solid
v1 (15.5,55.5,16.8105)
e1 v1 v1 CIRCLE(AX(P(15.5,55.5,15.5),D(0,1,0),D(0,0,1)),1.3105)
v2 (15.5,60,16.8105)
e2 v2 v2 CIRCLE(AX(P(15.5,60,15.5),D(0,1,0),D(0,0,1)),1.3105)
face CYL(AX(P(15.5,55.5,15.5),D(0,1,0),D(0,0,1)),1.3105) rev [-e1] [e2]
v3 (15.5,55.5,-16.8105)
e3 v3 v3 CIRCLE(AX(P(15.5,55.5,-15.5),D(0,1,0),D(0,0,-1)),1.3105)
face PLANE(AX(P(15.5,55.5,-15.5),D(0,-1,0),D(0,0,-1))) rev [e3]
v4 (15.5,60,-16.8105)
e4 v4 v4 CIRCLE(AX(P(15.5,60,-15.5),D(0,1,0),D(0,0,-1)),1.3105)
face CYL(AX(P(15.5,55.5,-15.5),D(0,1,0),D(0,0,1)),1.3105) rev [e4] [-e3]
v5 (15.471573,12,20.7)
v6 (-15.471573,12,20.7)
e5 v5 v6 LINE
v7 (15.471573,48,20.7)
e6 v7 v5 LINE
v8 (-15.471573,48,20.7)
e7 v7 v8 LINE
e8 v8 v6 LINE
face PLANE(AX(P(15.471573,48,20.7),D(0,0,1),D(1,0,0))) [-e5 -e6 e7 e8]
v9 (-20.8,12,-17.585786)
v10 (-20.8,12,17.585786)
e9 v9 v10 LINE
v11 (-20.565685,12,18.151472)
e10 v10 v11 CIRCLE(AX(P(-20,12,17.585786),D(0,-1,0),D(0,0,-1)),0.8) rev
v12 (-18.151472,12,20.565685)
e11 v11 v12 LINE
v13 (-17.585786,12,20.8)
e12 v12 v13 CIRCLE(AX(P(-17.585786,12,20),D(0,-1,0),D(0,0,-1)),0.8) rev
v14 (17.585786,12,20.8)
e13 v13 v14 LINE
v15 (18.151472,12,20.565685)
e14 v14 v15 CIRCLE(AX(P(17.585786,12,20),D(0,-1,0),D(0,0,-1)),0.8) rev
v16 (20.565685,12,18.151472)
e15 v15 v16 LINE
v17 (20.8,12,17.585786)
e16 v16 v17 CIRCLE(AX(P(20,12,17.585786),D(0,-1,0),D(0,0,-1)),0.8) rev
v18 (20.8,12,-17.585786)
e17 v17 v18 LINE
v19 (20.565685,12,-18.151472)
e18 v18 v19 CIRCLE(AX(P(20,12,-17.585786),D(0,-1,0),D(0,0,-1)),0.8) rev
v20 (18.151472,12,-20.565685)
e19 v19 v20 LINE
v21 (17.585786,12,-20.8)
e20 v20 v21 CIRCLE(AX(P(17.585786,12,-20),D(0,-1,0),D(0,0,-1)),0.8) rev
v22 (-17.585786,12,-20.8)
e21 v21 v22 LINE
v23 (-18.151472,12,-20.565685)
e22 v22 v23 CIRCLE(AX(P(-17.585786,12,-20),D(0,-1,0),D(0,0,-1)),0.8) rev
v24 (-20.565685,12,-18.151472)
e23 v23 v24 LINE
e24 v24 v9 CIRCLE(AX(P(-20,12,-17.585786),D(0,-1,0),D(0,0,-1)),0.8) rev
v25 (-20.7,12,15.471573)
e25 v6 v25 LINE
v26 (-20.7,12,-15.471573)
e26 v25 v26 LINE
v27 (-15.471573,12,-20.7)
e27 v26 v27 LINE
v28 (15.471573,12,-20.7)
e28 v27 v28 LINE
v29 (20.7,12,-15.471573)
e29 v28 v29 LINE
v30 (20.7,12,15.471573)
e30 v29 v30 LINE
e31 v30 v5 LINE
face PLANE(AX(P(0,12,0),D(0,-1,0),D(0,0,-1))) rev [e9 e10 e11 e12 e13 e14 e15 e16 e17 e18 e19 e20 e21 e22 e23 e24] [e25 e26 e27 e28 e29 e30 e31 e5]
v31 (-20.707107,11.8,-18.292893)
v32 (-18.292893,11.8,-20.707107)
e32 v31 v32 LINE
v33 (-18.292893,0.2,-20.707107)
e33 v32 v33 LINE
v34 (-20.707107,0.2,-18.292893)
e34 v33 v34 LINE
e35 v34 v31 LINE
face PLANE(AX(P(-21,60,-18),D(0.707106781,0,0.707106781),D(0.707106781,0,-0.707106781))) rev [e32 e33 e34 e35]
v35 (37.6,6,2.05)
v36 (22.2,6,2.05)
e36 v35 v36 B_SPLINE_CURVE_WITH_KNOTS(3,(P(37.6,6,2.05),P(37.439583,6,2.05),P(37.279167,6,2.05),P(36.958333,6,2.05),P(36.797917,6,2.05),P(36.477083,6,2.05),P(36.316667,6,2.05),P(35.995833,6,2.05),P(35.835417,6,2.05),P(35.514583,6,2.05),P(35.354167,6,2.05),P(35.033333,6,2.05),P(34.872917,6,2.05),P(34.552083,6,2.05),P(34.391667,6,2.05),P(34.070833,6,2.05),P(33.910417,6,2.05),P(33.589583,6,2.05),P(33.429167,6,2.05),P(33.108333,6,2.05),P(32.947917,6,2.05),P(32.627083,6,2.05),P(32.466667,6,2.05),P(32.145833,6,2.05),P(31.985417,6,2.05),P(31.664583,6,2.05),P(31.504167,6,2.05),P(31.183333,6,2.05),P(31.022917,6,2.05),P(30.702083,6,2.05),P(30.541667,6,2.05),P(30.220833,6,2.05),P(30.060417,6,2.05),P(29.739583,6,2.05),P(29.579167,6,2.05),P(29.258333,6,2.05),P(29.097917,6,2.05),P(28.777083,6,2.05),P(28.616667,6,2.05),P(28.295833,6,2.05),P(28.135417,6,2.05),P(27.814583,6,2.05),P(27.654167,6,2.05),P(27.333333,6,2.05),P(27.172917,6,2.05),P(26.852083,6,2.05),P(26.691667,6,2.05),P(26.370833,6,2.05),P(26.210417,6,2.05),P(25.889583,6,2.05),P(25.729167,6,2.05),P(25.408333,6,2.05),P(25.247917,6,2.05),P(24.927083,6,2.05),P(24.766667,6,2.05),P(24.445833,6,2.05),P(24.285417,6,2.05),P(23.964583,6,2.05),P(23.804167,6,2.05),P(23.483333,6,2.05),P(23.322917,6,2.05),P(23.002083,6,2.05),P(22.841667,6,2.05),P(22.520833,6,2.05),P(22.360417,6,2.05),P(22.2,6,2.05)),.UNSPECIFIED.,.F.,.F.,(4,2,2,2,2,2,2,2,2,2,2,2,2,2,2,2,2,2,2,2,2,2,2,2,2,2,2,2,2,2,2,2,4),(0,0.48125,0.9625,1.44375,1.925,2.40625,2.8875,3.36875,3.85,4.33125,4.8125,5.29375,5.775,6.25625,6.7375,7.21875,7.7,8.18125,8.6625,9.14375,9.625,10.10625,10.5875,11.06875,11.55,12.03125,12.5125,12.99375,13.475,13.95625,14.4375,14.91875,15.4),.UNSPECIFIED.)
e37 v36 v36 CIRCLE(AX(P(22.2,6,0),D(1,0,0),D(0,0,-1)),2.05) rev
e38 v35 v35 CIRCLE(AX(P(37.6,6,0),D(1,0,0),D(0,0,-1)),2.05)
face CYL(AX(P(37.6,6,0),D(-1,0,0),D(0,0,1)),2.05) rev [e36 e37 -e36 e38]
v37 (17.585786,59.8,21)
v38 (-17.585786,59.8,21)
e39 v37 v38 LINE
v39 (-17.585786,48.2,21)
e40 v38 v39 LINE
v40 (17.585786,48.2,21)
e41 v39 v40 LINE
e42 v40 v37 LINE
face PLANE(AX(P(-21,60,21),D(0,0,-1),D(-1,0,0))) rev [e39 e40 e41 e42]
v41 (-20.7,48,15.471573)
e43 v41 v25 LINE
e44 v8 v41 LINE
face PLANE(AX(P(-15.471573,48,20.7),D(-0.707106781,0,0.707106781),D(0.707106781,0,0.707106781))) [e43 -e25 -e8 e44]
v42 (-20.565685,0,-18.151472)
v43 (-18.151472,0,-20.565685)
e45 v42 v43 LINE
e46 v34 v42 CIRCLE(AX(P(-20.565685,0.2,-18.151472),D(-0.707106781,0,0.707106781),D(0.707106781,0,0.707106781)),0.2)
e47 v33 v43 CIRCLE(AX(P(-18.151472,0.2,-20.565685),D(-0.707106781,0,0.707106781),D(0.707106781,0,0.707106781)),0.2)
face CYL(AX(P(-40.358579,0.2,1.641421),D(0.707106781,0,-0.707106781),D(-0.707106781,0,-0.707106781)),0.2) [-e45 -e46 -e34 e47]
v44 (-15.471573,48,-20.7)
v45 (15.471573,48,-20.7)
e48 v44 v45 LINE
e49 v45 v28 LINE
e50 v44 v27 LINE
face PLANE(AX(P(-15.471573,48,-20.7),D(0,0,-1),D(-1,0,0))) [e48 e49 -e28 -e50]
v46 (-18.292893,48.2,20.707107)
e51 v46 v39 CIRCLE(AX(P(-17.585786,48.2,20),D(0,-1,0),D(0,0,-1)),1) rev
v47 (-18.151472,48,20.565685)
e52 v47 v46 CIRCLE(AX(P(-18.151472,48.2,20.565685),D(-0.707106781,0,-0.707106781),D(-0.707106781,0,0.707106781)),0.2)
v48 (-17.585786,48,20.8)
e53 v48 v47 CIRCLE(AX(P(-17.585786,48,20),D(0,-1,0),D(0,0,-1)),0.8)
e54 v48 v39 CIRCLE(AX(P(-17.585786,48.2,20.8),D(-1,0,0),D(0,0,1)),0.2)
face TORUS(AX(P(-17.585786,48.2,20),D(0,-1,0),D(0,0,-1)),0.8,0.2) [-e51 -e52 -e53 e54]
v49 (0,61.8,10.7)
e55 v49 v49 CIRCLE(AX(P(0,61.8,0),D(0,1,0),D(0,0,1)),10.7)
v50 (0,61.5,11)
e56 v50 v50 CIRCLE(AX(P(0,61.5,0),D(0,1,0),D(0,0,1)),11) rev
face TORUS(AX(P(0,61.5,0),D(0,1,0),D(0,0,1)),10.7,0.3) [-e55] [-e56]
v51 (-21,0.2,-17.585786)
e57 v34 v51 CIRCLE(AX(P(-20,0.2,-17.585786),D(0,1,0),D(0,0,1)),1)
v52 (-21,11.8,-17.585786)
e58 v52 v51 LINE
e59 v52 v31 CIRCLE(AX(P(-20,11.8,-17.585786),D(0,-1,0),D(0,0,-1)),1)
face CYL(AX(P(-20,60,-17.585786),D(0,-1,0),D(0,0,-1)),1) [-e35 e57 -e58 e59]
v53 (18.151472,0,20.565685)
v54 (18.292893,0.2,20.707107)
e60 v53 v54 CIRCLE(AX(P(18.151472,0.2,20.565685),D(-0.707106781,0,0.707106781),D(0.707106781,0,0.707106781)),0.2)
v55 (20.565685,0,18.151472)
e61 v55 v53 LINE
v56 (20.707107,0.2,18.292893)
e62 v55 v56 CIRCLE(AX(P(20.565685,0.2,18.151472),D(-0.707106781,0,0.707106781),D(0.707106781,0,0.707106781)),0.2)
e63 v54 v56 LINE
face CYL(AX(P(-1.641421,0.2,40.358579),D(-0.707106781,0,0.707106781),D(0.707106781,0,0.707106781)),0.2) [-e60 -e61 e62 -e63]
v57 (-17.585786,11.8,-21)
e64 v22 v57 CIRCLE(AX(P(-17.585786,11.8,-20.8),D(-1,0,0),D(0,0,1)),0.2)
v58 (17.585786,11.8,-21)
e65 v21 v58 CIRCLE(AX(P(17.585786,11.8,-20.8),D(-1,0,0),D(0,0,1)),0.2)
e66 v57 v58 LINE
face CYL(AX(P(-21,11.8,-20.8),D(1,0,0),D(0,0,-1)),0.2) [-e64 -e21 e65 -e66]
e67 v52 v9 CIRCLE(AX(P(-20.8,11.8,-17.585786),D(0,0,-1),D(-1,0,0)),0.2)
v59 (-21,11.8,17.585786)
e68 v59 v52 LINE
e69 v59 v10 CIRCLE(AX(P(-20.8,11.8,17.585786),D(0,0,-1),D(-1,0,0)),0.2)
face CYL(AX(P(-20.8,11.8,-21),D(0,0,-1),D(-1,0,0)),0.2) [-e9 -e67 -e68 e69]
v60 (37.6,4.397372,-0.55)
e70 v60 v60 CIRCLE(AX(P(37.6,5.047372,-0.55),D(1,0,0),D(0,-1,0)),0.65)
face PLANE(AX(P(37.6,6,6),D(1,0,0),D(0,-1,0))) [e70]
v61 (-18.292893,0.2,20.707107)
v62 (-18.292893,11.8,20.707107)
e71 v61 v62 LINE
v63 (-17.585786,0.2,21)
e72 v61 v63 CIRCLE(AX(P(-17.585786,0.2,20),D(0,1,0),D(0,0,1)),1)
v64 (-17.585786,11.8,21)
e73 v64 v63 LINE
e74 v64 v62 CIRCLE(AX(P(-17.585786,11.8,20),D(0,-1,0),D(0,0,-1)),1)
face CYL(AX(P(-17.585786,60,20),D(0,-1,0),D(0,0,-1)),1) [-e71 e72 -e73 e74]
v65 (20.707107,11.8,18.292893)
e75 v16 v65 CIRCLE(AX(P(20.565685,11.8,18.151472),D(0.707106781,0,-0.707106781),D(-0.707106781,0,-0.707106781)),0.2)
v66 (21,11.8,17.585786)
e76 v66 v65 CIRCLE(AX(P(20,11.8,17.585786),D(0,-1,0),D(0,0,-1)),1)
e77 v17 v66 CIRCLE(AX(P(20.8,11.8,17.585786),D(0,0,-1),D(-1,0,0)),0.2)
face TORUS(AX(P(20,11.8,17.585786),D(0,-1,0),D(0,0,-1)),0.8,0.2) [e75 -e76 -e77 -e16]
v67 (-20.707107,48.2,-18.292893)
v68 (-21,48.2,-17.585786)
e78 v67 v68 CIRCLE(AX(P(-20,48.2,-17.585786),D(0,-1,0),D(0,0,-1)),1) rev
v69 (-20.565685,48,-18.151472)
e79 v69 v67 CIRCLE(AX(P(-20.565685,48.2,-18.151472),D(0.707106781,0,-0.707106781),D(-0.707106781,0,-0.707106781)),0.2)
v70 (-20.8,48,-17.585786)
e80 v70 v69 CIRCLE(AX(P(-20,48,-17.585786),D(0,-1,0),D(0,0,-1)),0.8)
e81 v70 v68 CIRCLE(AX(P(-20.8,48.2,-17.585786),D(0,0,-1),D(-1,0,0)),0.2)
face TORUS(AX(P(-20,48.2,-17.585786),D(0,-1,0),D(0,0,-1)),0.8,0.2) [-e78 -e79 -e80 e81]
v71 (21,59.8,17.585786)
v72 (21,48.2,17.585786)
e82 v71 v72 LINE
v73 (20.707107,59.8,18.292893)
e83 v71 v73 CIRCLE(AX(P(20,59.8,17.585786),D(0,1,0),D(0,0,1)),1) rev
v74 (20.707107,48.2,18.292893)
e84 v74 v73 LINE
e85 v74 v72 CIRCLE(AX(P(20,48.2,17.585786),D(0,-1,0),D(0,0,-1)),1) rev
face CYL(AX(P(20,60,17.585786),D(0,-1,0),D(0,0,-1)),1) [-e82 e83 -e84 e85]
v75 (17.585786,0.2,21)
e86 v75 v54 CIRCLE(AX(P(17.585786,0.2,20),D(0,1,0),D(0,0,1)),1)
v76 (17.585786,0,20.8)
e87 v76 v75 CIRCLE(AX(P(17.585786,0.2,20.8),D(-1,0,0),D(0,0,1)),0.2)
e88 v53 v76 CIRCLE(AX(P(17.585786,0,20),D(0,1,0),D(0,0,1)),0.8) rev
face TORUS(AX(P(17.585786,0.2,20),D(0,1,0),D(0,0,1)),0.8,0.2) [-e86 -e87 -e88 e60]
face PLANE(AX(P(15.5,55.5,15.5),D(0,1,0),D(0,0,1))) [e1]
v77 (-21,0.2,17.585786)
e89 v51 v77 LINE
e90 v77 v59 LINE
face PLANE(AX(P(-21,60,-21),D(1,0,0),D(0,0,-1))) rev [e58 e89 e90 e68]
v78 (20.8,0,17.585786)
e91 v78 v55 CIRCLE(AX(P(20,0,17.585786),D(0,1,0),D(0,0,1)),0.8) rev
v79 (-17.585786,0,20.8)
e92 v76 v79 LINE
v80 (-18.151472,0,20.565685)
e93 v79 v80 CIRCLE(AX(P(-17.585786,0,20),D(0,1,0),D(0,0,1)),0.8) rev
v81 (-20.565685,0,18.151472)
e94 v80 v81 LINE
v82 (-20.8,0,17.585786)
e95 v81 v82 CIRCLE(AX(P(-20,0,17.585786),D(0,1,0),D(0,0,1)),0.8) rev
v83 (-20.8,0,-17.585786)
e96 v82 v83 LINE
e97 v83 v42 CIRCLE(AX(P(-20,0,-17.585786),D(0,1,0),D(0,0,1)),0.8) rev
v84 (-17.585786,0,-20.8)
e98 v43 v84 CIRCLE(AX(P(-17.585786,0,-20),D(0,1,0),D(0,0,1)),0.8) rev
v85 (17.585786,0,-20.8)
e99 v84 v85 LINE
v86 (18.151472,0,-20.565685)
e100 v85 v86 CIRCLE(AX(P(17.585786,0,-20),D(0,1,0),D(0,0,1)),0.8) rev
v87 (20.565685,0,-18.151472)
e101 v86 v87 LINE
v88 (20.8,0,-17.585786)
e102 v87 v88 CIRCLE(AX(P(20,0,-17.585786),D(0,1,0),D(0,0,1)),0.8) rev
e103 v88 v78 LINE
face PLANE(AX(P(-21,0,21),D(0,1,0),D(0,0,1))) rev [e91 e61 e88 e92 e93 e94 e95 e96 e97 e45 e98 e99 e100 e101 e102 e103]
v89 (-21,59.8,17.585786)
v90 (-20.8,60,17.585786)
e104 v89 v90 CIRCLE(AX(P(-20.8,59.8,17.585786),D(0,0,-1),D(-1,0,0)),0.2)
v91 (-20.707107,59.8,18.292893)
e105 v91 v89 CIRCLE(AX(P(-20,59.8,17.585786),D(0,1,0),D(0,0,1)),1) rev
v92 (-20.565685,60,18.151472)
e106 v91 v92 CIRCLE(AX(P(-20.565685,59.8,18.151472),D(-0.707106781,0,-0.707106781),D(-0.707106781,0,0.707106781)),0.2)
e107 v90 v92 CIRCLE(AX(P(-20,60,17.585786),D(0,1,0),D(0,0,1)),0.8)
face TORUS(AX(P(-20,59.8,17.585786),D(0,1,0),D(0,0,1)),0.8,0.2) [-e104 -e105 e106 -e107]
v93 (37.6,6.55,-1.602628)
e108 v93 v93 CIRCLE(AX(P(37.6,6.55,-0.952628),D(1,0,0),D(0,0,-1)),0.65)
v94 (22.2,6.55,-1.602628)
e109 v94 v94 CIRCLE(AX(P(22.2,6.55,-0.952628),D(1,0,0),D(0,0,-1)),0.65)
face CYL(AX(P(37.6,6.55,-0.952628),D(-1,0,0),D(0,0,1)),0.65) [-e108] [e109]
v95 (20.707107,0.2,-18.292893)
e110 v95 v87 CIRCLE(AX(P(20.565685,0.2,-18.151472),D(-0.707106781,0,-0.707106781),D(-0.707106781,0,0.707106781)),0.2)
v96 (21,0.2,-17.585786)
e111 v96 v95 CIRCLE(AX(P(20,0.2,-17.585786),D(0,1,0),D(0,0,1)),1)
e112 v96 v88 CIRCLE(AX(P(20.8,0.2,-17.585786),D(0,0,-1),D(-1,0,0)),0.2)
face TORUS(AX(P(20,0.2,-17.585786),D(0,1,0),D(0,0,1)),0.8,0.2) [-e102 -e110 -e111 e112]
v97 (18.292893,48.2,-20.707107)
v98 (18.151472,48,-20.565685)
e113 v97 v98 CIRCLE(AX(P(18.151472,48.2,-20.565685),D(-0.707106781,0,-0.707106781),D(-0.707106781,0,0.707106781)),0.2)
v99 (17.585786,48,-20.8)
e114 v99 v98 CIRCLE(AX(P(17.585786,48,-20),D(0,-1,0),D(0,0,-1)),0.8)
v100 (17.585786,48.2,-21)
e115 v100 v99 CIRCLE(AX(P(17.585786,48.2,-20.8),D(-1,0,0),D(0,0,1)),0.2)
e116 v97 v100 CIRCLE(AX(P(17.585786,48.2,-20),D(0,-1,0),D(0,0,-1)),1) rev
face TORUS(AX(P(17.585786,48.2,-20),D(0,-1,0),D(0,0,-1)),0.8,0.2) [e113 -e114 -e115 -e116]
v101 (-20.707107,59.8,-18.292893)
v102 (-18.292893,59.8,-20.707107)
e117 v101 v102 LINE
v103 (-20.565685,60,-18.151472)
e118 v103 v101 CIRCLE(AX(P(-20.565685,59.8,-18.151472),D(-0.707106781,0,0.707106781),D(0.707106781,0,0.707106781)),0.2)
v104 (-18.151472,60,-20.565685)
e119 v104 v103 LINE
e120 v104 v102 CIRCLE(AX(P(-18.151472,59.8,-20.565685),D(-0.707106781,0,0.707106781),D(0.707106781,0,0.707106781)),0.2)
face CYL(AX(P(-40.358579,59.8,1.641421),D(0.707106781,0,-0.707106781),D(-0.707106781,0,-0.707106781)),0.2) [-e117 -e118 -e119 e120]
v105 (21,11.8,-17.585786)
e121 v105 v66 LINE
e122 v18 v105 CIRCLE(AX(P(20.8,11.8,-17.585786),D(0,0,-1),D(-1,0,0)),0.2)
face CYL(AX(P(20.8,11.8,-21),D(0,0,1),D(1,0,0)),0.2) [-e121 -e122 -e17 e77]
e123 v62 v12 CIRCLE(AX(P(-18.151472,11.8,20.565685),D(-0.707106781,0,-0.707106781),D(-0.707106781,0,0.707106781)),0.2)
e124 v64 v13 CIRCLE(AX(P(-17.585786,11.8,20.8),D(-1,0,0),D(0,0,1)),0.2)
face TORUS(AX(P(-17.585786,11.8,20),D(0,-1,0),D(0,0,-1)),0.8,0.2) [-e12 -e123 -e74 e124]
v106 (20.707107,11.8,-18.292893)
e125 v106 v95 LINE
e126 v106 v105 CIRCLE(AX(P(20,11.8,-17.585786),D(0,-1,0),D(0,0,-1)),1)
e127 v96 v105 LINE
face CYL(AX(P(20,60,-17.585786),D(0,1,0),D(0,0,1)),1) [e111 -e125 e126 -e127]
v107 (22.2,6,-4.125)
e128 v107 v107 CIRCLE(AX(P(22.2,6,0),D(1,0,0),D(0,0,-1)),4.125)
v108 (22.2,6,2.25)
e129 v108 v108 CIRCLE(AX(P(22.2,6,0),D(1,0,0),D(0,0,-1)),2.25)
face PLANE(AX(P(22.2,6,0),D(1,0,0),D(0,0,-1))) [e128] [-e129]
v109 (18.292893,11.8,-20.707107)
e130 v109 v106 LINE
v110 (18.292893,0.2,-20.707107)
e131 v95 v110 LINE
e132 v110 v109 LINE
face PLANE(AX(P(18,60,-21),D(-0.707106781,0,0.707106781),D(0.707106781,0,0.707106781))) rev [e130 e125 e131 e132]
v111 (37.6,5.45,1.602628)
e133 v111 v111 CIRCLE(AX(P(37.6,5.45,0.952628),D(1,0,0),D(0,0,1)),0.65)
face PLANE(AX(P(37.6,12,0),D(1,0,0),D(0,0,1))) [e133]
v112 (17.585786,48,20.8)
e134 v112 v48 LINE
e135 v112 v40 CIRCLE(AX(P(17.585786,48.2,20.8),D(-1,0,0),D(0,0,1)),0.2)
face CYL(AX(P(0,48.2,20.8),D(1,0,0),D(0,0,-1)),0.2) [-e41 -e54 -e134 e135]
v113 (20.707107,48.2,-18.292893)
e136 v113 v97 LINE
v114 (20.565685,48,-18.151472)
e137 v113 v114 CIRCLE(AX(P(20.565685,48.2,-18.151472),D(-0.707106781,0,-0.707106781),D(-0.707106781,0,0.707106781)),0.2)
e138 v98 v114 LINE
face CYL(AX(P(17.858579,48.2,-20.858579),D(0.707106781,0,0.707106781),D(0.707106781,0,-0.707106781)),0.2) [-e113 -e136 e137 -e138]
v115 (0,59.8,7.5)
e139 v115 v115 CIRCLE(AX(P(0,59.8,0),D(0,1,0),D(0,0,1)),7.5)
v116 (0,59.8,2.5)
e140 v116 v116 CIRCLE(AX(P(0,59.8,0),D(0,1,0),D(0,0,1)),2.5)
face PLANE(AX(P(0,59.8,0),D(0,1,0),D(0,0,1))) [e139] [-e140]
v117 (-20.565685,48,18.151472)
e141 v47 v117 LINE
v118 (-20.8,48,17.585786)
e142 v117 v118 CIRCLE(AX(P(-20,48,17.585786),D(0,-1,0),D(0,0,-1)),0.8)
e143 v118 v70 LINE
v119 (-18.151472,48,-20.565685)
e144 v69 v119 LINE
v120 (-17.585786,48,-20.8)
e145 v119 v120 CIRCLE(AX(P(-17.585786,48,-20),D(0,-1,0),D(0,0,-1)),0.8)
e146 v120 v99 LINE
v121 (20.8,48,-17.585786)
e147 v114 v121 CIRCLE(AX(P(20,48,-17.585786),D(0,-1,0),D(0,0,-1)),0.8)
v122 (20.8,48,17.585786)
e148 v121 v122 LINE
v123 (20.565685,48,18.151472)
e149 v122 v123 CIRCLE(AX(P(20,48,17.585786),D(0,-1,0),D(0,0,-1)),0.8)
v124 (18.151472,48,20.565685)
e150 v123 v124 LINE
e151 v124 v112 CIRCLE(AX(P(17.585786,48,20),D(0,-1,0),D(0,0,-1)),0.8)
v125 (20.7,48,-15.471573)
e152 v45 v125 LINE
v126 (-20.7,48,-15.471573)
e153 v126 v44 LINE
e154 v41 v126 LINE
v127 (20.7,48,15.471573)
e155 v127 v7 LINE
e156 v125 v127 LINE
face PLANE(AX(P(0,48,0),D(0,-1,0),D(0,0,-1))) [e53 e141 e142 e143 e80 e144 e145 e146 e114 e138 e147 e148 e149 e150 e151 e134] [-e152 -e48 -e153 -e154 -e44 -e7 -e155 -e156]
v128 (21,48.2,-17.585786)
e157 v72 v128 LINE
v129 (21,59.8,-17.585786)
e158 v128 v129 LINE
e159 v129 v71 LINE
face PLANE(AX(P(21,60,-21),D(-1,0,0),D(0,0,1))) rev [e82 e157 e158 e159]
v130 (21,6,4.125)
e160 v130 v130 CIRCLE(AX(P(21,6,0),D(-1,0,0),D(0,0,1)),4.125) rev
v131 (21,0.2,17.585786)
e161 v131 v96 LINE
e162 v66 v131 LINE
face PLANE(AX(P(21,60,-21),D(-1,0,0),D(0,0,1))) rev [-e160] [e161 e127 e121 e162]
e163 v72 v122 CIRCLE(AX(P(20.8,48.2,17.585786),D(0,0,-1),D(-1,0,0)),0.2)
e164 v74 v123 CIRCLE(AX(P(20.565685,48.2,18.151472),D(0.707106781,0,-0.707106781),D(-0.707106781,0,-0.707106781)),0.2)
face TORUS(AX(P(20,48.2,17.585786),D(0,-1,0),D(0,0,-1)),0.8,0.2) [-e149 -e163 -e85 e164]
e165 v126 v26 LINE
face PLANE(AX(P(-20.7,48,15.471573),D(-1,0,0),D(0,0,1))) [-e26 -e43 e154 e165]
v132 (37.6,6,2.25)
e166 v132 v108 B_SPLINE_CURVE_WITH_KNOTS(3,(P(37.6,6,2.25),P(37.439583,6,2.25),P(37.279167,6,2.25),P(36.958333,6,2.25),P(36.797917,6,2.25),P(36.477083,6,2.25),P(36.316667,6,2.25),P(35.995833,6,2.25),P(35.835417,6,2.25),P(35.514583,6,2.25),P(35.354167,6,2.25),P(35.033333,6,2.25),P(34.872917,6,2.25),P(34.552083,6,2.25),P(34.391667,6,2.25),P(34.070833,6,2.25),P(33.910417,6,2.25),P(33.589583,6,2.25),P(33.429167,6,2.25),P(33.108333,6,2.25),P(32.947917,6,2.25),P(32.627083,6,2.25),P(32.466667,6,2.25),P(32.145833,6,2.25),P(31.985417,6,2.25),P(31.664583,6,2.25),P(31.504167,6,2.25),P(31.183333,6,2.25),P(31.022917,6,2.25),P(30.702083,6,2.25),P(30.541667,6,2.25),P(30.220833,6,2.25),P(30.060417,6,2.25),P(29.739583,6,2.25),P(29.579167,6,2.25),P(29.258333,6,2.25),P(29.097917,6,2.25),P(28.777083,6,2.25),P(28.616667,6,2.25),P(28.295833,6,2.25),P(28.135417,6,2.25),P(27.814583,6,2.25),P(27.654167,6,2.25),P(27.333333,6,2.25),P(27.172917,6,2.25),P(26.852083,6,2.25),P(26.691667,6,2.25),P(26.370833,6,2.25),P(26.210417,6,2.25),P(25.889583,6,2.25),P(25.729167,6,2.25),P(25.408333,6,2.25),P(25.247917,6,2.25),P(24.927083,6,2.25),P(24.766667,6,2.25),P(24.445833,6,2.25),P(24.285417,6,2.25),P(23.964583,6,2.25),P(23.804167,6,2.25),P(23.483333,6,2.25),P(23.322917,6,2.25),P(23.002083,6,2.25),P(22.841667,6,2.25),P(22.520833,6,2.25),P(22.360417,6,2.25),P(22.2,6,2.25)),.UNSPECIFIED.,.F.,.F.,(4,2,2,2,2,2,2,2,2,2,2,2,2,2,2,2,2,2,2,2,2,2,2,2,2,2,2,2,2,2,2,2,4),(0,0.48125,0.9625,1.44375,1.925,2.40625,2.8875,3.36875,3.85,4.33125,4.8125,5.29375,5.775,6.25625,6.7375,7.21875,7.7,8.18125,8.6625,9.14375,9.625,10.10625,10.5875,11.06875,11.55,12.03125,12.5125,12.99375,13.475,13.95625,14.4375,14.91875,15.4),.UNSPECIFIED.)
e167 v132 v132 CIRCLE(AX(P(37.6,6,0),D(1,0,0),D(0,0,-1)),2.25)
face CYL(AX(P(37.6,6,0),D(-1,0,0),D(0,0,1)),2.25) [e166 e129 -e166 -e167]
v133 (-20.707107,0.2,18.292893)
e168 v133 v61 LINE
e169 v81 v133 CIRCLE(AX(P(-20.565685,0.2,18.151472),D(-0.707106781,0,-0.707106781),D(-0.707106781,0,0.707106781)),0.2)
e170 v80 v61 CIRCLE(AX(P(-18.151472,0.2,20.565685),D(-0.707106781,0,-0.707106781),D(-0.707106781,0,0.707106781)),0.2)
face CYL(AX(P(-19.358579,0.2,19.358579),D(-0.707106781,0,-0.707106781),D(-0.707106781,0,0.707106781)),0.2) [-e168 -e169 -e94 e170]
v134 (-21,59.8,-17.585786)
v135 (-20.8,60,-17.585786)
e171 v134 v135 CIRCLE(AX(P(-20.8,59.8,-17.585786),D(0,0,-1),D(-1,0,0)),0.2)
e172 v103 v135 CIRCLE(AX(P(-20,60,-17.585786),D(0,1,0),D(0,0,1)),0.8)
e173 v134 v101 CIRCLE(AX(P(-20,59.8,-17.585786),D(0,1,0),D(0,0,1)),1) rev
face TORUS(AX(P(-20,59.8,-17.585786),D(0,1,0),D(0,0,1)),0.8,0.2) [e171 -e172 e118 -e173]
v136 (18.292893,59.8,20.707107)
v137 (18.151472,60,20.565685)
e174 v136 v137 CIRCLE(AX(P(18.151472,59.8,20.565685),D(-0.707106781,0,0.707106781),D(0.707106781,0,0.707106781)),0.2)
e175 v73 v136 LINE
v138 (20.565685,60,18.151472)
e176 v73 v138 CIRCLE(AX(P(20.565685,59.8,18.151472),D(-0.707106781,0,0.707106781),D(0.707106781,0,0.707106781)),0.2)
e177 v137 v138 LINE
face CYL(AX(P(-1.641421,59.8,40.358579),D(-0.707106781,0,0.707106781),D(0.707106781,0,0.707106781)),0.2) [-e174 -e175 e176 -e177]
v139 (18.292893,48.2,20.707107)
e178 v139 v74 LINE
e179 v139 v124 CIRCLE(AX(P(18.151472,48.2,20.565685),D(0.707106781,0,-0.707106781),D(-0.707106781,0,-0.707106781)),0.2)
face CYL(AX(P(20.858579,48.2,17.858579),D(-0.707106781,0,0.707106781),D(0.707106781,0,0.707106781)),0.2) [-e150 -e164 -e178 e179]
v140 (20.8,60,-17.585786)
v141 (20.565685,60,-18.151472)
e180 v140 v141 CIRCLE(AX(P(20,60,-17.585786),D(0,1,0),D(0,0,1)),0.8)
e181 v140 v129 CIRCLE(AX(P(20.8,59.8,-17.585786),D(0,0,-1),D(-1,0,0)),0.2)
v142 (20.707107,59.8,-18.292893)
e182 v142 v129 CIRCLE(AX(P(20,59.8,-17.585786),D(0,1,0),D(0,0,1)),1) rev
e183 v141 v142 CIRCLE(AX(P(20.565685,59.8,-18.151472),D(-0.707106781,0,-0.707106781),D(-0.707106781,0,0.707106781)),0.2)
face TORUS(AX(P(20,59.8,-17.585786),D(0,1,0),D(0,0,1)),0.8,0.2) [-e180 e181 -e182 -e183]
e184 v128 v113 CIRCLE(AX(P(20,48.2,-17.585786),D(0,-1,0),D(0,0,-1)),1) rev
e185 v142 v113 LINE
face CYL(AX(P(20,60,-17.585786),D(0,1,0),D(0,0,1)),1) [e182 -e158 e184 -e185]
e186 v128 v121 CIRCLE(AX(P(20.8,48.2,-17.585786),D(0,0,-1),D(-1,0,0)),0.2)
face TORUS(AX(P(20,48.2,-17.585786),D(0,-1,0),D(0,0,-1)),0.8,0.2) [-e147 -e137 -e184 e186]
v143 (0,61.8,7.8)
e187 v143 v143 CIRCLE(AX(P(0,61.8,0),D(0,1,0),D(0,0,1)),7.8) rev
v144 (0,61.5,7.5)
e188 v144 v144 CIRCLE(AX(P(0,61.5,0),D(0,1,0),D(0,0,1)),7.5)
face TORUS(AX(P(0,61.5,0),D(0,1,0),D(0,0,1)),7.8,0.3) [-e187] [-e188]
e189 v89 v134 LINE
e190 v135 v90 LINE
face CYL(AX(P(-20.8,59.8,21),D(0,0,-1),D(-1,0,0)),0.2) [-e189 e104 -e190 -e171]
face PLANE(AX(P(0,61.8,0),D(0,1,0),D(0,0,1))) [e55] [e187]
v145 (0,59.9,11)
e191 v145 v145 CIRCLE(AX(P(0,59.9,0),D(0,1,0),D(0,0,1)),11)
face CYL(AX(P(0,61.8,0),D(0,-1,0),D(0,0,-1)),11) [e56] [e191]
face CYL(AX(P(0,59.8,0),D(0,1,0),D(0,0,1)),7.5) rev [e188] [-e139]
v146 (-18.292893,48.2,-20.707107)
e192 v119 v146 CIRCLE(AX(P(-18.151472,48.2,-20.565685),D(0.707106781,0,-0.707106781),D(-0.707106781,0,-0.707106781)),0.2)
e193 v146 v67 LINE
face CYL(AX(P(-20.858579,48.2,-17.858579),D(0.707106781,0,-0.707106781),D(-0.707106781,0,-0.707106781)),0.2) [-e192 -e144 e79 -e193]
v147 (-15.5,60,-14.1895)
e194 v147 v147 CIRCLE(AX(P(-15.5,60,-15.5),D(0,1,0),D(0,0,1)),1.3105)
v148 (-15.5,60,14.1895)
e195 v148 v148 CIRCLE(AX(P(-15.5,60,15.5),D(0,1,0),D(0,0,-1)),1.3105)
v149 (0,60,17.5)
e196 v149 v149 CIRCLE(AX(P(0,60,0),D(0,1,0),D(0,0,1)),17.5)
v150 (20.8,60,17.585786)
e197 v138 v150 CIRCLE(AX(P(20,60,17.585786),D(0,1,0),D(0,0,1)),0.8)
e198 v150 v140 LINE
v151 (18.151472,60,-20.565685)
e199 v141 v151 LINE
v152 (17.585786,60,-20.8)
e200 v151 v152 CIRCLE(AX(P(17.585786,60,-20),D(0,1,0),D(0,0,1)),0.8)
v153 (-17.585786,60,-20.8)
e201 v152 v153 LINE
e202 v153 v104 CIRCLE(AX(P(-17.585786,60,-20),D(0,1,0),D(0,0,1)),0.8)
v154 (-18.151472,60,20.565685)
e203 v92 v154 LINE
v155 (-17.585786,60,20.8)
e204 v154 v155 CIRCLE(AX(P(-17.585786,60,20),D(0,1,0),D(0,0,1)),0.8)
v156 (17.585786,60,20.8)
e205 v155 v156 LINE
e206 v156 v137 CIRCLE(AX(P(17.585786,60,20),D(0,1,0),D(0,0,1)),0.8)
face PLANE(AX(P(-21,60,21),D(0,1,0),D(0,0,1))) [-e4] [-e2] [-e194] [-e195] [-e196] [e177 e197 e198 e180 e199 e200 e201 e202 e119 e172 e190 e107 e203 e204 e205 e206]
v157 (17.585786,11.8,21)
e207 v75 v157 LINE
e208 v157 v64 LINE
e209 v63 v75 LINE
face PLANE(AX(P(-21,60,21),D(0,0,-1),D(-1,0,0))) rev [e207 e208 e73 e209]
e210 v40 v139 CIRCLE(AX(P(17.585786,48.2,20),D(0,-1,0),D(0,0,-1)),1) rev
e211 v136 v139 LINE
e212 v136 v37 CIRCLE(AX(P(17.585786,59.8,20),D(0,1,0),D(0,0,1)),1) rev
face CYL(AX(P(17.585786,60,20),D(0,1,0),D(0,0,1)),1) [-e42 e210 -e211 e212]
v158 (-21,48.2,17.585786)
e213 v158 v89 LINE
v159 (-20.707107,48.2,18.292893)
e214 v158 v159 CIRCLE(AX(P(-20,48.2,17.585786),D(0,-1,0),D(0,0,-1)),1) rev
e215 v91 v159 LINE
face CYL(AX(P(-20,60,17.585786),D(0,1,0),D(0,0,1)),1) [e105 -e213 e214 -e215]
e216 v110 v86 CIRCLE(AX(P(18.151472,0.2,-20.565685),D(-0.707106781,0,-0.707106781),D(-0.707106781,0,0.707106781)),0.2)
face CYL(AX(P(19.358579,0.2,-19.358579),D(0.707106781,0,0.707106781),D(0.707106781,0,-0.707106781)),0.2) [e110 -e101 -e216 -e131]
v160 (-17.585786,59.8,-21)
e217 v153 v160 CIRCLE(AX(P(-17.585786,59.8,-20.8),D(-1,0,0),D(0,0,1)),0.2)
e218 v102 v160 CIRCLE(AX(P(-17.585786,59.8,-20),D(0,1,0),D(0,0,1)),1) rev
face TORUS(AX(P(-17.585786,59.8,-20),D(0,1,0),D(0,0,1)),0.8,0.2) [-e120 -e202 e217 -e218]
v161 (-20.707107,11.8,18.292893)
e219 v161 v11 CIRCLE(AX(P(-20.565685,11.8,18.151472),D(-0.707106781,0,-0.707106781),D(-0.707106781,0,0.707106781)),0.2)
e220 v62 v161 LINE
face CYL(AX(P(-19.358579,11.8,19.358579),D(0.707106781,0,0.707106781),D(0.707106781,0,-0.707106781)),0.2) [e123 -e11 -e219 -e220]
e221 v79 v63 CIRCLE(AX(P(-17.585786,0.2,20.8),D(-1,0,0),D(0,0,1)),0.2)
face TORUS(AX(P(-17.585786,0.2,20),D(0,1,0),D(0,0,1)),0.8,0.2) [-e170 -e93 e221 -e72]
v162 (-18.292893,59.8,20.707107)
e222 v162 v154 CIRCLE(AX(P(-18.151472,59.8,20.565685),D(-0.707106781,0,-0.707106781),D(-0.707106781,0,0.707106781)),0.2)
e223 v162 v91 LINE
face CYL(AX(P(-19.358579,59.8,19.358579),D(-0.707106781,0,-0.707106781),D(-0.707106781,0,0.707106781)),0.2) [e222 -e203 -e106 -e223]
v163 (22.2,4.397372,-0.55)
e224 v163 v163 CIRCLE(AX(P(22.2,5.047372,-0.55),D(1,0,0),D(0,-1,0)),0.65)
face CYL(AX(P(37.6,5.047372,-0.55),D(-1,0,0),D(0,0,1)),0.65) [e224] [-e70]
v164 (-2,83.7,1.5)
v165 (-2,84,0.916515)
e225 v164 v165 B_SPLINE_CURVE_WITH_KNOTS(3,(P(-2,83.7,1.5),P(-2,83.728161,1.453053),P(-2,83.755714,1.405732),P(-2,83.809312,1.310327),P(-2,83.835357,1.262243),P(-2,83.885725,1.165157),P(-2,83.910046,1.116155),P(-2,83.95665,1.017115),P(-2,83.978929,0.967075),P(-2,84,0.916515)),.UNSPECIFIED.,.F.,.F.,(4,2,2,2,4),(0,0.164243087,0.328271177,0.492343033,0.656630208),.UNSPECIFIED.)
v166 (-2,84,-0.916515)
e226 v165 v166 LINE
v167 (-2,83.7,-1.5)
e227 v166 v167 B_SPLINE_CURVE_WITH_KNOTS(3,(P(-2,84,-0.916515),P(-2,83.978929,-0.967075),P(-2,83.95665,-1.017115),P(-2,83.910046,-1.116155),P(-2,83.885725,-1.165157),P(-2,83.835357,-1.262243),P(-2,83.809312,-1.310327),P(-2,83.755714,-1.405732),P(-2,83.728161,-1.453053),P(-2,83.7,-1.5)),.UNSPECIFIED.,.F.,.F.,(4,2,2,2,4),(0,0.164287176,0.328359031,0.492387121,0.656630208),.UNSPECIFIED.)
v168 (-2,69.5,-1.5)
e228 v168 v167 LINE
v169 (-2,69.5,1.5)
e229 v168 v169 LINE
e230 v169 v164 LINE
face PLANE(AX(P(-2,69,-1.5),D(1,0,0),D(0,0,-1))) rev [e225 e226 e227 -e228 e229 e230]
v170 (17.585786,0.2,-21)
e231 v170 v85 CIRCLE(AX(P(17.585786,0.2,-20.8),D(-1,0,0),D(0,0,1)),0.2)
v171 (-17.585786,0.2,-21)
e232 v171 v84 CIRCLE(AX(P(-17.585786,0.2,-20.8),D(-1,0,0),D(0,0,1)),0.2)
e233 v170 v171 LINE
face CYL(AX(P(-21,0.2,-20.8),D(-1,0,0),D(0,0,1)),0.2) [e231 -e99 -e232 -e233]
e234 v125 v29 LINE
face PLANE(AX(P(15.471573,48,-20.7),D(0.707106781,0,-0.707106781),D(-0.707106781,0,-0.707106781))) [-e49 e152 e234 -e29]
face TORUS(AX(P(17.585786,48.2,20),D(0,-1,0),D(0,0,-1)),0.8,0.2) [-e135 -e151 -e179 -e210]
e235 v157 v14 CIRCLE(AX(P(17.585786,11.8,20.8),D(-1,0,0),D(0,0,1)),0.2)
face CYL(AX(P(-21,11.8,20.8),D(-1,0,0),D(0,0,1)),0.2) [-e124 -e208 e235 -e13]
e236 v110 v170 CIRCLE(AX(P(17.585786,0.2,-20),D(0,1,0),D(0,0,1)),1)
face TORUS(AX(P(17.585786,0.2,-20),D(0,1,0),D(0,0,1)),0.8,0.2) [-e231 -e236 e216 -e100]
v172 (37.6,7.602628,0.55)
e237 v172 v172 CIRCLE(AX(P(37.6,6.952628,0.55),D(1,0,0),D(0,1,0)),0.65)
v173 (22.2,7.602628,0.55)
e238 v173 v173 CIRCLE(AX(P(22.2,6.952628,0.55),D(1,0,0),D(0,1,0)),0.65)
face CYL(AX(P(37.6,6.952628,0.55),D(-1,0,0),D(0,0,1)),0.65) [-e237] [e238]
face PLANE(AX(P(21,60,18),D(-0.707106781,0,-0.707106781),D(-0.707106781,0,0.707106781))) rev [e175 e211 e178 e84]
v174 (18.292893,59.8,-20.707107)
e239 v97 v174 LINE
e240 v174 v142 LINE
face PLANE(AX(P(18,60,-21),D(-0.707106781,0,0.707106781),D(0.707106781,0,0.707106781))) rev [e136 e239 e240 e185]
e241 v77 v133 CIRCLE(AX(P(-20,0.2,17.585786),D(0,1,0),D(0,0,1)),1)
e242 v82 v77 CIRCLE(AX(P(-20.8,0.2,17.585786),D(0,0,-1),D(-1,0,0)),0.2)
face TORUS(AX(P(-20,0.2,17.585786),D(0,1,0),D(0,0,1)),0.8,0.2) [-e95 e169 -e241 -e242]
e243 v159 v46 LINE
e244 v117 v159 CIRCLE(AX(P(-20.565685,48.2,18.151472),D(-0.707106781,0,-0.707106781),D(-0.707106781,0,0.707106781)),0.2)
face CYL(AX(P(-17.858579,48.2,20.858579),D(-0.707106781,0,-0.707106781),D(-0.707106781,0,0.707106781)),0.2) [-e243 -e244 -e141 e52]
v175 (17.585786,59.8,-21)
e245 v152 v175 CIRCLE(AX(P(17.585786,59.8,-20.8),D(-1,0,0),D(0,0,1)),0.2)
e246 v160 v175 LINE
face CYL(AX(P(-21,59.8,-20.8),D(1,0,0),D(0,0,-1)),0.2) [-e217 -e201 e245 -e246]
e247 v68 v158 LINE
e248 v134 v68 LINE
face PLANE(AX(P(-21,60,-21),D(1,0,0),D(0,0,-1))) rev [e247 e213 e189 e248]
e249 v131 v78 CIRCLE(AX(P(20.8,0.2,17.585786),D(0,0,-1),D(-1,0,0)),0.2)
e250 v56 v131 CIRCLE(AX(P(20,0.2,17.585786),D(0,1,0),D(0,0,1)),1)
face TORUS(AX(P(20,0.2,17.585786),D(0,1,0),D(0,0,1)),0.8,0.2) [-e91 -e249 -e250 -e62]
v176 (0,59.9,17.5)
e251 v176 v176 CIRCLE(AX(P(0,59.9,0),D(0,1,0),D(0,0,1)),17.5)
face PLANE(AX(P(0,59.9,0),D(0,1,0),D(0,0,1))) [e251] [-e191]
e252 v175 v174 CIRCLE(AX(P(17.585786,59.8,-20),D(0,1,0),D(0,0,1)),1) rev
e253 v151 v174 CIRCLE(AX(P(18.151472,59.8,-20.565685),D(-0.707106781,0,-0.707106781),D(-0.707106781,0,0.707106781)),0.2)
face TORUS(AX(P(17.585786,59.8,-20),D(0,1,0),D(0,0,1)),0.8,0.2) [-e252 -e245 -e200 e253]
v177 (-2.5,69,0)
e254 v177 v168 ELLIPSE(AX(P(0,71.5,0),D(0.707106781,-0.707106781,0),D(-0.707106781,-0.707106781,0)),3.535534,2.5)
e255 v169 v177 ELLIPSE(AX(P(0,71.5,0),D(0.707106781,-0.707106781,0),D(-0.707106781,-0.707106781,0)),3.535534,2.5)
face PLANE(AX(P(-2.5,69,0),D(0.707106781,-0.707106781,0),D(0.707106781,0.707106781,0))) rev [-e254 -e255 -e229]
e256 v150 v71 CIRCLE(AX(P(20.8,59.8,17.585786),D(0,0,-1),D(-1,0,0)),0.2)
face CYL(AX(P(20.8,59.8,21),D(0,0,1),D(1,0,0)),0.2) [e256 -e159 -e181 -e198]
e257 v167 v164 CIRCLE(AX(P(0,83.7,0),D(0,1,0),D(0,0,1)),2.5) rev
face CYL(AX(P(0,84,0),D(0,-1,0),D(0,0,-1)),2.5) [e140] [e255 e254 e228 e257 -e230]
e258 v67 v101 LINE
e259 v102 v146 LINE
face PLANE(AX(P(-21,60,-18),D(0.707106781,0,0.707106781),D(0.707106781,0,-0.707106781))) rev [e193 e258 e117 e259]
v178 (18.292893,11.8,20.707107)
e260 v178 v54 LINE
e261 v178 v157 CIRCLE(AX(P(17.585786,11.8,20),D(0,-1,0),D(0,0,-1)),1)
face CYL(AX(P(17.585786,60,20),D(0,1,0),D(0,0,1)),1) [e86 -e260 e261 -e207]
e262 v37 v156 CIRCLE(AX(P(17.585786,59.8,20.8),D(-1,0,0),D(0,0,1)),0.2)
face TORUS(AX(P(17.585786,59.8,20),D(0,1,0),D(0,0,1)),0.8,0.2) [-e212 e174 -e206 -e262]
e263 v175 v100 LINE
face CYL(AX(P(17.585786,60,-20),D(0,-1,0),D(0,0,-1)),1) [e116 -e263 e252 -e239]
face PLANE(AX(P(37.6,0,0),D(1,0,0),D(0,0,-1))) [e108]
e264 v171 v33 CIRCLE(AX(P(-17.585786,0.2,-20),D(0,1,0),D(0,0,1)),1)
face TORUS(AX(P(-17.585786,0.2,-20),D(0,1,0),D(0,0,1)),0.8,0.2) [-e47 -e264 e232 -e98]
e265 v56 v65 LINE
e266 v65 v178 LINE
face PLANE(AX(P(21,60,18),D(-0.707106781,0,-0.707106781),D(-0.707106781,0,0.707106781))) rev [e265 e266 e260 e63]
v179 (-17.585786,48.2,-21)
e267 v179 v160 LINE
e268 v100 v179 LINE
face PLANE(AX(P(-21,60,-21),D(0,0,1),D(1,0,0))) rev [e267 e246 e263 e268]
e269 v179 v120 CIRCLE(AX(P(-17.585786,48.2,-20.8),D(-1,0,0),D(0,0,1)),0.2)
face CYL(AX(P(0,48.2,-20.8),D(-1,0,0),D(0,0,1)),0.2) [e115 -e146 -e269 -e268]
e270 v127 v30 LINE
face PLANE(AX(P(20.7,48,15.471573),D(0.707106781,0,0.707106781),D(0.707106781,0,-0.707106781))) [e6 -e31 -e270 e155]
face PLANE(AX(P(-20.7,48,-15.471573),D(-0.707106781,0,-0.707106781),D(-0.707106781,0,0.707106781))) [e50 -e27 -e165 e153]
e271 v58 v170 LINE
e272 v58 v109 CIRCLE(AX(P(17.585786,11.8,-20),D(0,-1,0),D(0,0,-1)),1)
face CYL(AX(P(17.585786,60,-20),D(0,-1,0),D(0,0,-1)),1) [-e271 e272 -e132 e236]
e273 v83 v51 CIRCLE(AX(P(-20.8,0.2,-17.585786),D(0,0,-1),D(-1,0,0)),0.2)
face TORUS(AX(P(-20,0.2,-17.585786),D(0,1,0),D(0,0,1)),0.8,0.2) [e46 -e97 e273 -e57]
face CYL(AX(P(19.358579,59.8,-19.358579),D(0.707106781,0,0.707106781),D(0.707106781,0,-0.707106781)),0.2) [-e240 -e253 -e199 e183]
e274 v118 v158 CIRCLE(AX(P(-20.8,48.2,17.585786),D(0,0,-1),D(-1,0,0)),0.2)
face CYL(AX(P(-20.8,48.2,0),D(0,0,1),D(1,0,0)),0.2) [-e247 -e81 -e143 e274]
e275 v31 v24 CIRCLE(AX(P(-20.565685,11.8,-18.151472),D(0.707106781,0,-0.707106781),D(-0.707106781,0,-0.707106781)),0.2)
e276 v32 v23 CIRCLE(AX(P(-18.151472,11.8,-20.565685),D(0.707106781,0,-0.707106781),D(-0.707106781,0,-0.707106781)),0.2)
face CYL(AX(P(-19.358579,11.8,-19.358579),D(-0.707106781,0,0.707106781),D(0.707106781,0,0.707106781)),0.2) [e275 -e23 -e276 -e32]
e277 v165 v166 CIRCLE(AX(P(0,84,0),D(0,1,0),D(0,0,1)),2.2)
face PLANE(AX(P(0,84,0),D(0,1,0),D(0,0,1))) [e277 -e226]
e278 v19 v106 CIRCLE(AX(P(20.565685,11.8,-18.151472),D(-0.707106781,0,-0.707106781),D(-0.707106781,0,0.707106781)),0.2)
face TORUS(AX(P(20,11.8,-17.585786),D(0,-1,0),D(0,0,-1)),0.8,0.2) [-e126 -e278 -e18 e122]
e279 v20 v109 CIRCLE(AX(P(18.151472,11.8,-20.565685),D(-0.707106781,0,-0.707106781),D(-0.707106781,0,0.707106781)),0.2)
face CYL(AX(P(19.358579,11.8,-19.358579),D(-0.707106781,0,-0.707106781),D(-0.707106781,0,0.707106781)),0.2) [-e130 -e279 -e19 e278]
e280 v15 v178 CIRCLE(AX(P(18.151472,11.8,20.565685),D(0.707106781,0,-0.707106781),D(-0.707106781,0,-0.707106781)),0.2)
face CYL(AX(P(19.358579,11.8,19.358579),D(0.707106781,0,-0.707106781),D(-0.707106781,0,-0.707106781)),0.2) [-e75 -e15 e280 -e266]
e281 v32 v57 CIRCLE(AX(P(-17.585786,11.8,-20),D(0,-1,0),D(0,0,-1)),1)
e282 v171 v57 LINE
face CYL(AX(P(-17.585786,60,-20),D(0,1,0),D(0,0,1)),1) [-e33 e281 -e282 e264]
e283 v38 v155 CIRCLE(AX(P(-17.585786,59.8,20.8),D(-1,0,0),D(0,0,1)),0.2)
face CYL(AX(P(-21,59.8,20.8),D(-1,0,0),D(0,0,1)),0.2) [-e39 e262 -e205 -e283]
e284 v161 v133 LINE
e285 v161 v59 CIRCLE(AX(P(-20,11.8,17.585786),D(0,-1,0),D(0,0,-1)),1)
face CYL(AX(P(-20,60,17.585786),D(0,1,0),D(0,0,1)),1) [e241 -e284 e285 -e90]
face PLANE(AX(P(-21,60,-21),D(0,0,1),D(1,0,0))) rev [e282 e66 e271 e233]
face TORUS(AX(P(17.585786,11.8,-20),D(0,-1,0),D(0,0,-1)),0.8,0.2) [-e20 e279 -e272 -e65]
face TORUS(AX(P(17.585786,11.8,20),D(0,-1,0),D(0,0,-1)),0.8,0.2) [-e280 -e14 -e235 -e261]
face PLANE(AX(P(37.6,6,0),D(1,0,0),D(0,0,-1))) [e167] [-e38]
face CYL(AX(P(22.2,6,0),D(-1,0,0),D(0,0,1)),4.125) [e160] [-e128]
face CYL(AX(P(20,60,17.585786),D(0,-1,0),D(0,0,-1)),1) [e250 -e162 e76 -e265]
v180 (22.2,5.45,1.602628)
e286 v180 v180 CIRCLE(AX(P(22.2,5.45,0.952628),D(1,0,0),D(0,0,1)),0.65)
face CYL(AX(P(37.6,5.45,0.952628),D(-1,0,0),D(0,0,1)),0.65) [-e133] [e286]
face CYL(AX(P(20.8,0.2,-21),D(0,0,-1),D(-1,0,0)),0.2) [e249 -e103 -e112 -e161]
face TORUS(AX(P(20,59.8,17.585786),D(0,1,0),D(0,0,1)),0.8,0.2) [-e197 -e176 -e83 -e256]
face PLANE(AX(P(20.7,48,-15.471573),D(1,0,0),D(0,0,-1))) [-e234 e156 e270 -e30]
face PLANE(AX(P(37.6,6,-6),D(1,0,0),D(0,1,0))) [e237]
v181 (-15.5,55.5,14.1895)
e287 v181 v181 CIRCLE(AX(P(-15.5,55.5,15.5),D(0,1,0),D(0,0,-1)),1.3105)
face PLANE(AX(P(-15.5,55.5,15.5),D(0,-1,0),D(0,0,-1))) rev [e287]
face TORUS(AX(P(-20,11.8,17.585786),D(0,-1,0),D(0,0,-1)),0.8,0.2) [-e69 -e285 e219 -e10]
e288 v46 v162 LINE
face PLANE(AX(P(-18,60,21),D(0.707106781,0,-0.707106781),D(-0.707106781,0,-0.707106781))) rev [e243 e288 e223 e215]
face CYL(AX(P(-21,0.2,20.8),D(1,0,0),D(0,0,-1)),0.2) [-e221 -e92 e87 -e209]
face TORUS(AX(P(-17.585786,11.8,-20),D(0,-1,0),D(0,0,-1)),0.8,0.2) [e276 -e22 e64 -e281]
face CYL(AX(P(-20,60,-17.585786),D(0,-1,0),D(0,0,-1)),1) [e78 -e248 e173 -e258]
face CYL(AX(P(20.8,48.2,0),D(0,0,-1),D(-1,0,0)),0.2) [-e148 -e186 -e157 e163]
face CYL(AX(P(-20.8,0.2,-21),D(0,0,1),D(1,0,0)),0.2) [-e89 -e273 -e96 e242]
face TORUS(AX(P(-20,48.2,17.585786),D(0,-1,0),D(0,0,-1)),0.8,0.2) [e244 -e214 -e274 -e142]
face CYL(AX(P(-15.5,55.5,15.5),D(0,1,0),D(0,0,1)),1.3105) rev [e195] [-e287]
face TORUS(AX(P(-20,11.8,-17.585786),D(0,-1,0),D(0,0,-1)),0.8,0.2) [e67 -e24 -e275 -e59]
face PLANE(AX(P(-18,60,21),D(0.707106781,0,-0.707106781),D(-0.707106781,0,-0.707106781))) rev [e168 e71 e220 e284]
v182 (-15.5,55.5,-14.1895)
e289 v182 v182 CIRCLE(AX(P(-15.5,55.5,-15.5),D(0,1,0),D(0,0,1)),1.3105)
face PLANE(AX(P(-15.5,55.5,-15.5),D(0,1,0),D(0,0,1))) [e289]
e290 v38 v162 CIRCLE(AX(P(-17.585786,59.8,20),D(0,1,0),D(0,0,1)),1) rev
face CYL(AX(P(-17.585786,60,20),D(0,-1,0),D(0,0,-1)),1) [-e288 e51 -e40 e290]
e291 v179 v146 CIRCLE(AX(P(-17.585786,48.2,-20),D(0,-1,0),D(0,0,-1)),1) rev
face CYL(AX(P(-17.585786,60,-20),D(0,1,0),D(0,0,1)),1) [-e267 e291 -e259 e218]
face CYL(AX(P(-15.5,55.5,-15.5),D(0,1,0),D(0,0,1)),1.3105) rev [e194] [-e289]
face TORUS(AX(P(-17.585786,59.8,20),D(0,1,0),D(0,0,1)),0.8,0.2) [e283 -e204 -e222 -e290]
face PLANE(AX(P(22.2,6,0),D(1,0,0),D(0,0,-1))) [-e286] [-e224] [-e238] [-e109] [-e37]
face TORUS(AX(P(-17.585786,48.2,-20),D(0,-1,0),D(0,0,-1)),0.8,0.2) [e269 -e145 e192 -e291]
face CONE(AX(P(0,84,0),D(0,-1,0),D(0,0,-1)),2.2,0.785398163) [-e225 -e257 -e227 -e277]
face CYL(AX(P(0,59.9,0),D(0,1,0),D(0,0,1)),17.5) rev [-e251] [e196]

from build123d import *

# Parameters (mm, degrees)
SKETCH_1_W               = 42
SKETCH_1_H               = 42
EXTRUDE_1_DEPTH          = 60
CHAMFER_3_SIZE           = 3
SKETCH_2_R               = 11
EXTRUDE_2_DEPTH          = 1.8
SKETCH_3_R               = 2.5
EXTRUDE_3_DEPTH          = 24
SKETCH_4_OUTSIDE_W       = 64.576
SKETCH_4_OUTSIDE_H       = 64.576
CUT_EXTRUDE_1_DEPTH      = 36
FILLET_2_R               = 1
FILLET_3_R               = 0.2
CUT_EXTRUDE_START        = -15
CUT_EXTRUDE_5_DEPTH      = 15
CHAMFER_5_SIZE           = 0.3
CHAMFER_4_SIZE           = 0.5
SKETCH_6_R               = 1.3105
CUT_EXTRUDE_2_DEPTH      = 4.5
CUT_EXTRUDE_START_2      = -2
SKETCH_7_R               = 7.5
SKETCH_7_R_2             = 2.5
CUT_EXTRUDE_3_DEPTH      = 2
SKETCH_8_R               = 4.125
EXTRUDE_5_DEPTH          = 1.2
SKETCH_9_R               = 2.25
SKETCH_9_R_2             = 2.05
EXTRUDE_6_DEPTH          = 15.4
SKETCH_10_R              = 0.65
EXTRUDE_8_DEPTH          = 15.4
CUT_EXTRUDE_START_3      = -0.1
SKETCH_15_R              = 17.5
SKETCH_15_R_2            = 11
CUT_EXTRUDE_6_DEPTH      = 0.1
FILLET_4_R               = 0.3
PATTERN_CIRCULAR_3_COUNT = 4


with BuildPart() as part:
    # 草图1 → 凸台-拉伸1 (new body)
    with BuildSketch(Plane(origin=(0, 0, 0), x_dir=(1, 0, 0), z_dir=(0, 1, 0))):
        Rectangle(SKETCH_1_W, SKETCH_1_H)
    extrude(amount=EXTRUDE_1_DEPTH)

    # 倒角3
    chamfer_3_edges = [part.edges().sort_by_distance(p)[0] for p in [
        (-21, 30, -21),
        (21, 30, -21),
        (21, 30, 21),
        (-21, 30, 21),
    ]]
    chamfer(chamfer_3_edges, length=CHAMFER_3_SIZE)

    # 草图2 → 凸台-拉伸2 (add)
    with BuildSketch(Plane(origin=(0, 60, 0), x_dir=(1, 0, 0), z_dir=(0, 1, 0))):
        with Locations(Location((0, 0, 0), (0, 0, 270))):
            Circle(SKETCH_2_R)
    extrude(amount=EXTRUDE_2_DEPTH)

    # 草图3 → 凸台-拉伸3 (add)
    with BuildSketch(Plane(origin=(0, 60, 0), x_dir=(1, 0, 0), z_dir=(0, 1, 0))):
        with Locations(Location((0, 0, 0), (0, 0, 270))):
            Circle(SKETCH_3_R)
    extrude(amount=EXTRUDE_3_DEPTH)

    # 草图4 outside → 切除-拉伸1 (cut)
    with BuildSketch(Plane.XZ.offset(-12)):
        Rectangle(SKETCH_4_OUTSIDE_W, SKETCH_4_OUTSIDE_H)
        Polygon((15.471572875, 20.7), (-15.471572875, 20.7), (-20.7, 15.471572875), (-20.7, -15.471572875), (-15.471572875, -20.7), (15.471572875, -20.7), (20.7, -15.471572875), (20.7, 15.471572875), align=None, mode=Mode.SUBTRACT)
    extrude(amount=-CUT_EXTRUDE_1_DEPTH, mode=Mode.SUBTRACT)

    # 圆角2
    fillet_2_edges = [part.edges().sort_by_distance(p)[0] for p in [
        (-18, 6, -21),
        (18, 54, -21),
        (21, 54, 18),
        (21, 6, -18),
        (-18, 54, 21),
        (18, 6, 21),
        (-21, 54, -18),
        (-21, 6, 18),
        (-18, 54, -21),
        (-21, 6, -18),
        (-21, 54, 18),
        (-18, 6, 21),
        (18, 54, 21),
        (21, 6, 18),
        (21, 54, -18),
        (18, 6, -21),
    ]]
    fillet(fillet_2_edges, radius=FILLET_2_R)

    # 圆角3
    fillet_3_edges = [part.edges().sort_by_distance(p)[0] for p in [
        (21, 12, 0),
        (21, 0, 0),
        (0, 0, -21),
        (19.5, 0, -19.5),
        (19.5, 0, 19.5),
        (0, 0, 21),
        (-19.5, 0, 19.5),
        (-21, 0, 0),
        (-19.5, 0, -19.5),
        (-20.923879533, 0, -17.96846987),
        (-17.96846987, 0, -20.923879533),
        (17.96846987, 0, -20.923879533),
        (20.923879533, 0, -17.96846987),
        (-20.923879533, 0, 17.96846987),
        (-17.96846987, 0, 20.923879533),
        (17.96846987, 0, 20.923879533),
        (20.923879533, 0, 17.96846987),
        (19.5, 12, 19.5),
        (19.5, 12, -19.5),
        (0, 12, -21),
        (-19.5, 12, -19.5),
        (-21, 12, 0),
        (-19.5, 12, 19.5),
        (0, 12, 21),
        (-20.923879533, 12, -17.96846987),
        (-17.96846987, 12, -20.923879533),
        (17.96846987, 12, -20.923879533),
        (20.923879533, 12, -17.96846987),
        (-20.923879533, 12, 17.96846987),
        (-17.96846987, 12, 20.923879533),
        (17.96846987, 12, 20.923879533),
        (20.923879533, 12, 17.96846987),
        (0, 48, -21),
        (0, 60, -21),
        (21, 60, 0),
        (19.5, 60, -19.5),
        (-19.5, 60, -19.5),
        (-21, 60, 0),
        (-19.5, 60, 19.5),
        (0, 60, 21),
        (19.5, 60, 19.5),
        (-20.923879533, 60, 17.96846987),
        (-17.96846987, 60, 20.923879533),
        (17.96846987, 60, 20.923879533),
        (20.923879533, 60, 17.96846987),
        (17.96846987, 60, -20.923879533),
        (20.923879533, 60, -17.96846987),
        (-20.923879533, 60, -17.96846987),
        (-17.96846987, 60, -20.923879533),
        (-19.5, 48, -19.5),
        (0, 48, 21),
        (-19.5, 48, 19.5),
        (-21, 48, 0),
        (19.5, 48, -19.5),
        (21, 48, 0),
        (19.5, 48, 19.5),
        (-20.923879533, 48, 17.96846987),
        (-17.96846987, 48, 20.923879533),
        (17.96846987, 48, 20.923879533),
        (20.923879533, 48, 17.96846987),
        (17.96846987, 48, -20.923879533),
        (20.923879533, 48, -17.96846987),
        (-20.923879533, 48, -17.96846987),
        (-17.96846987, 48, -20.923879533),
    ]]
    fillet(fillet_3_edges, radius=FILLET_3_R)

    # 草图14 → 切除-拉伸5 (cut)
    with BuildSketch(Plane(origin=(0, 84, 0), x_dir=(1, 0, 0), z_dir=(0, 1, 0)).offset(CUT_EXTRUDE_START)):
        with BuildLine():
            Line((-2, 1.5), (-2, -1.5))
            ThreePointArc((-2, -1.5), (-2.5, 0), (-2, 1.5))
        make_face()
    extrude(amount=CUT_EXTRUDE_5_DEPTH, mode=Mode.SUBTRACT)

    # 倒角5
    chamfer_5_edges = [part.edges().sort_by_distance(p)[0] for p in [
        (2.236067977, 84, -1.118033989),
    ]]
    chamfer(chamfer_5_edges, length=CHAMFER_5_SIZE)

    # 倒角4
    chamfer_4_edges = [part.edges().sort_by_distance(p)[0] for p in [
        (-2, 69, 0),
    ]]
    chamfer(chamfer_4_edges, length=CHAMFER_4_SIZE - 0.0001)  # a hair under: the kernel refuses the full size

    # 草图6 → 切除-拉伸2 (cut)
    with BuildSketch(Plane(origin=(0, 60, 0), x_dir=(1, 0, 0), z_dir=(0, 1, 0))):
        with Locations(Location((-15.5, 15.5, 0), (0, 0, 270))):
            Circle(SKETCH_6_R)
        with Locations(Location((15.5, 15.5, 0), (0, 0, 90))):
            Circle(SKETCH_6_R)
        with Locations(Location((15.5, -15.5, 0), (0, 0, 270))):
            Circle(SKETCH_6_R)
        with Locations(Location((-15.5, -15.5, 0), (0, 0, 90))):
            Circle(SKETCH_6_R)
    extrude(amount=-CUT_EXTRUDE_2_DEPTH, mode=Mode.SUBTRACT)

    # 草图7 → 切除-拉伸3 (cut)
    with BuildSketch(Plane(origin=(0, 61.8, 0), x_dir=(1, 0, 0), z_dir=(0, 1, 0)).offset(CUT_EXTRUDE_START_2)):
        with Locations(Location((0, 0, 0), (0, 0, 270))):
            Circle(SKETCH_7_R)
        with Locations(Location((0, 0, 0), (0, 0, 143.130102354))):
            Circle(SKETCH_7_R_2, mode=Mode.SUBTRACT)
    extrude(amount=CUT_EXTRUDE_3_DEPTH, mode=Mode.SUBTRACT)

    # 草图8 → 凸台-拉伸5 (add)
    with BuildSketch(Plane(origin=(21, 0, 0), x_dir=(0, 0, -1), z_dir=(1, 0, 0))):
        with Locations(Location((0, 6, 0), (0, 0, 180))):
            Circle(SKETCH_8_R)
    extrude(amount=EXTRUDE_5_DEPTH)

    # 草图9 → 凸台-拉伸6 (add)
    with BuildSketch(Plane(origin=(22.2, 0, 0), x_dir=(0, 0, -1), z_dir=(1, 0, 0))):
        with Locations(Location((0, 6, 0), (0, 0, 180))):
            Circle(SKETCH_9_R)
        with Locations(Location((0, 6, 0), (0, 0, 180))):
            Circle(SKETCH_9_R_2, mode=Mode.SUBTRACT)
    extrude(amount=EXTRUDE_6_DEPTH)

    # 草图10 → 凸台-拉伸8 (add)
    with BuildSketch(Plane(origin=(22.2, 0, 0), x_dir=(0, 0, -1), z_dir=(1, 0, 0))):
        with Locations((0.952627944, 6.55)):
            Circle(SKETCH_10_R)
    extrude_8 = extrude(amount=EXTRUDE_8_DEPTH)

    # 草图15 → 切除-拉伸6 (cut)
    with BuildSketch(Plane(origin=(0, 60, 0), x_dir=(1, 0, 0), z_dir=(0, 1, 0)).offset(CUT_EXTRUDE_START_3)):
        with Locations(Location((0, 0, 0), (0, 0, 270))):
            Circle(SKETCH_15_R)
        with Locations(Location((0, 0, 0), (0, 0, 270))):
            Circle(SKETCH_15_R_2, mode=Mode.SUBTRACT)
    extrude(amount=CUT_EXTRUDE_6_DEPTH, mode=Mode.SUBTRACT)

    # 圆角4
    fillet_4_edges = [part.edges().sort_by_distance(p)[0] for p in [
        (0, 61.8, -11),
        (0, 61.8, -7.5),
    ]]
    fillet(fillet_4_edges, radius=FILLET_4_R)

    # 阵列(圆周)3: 凸台-拉伸8 ×4 about axis
    pattern_circular_3_axis = Axis((0, 6, 0), (1, 0, 0))
    for i in range(1, PATTERN_CIRCULAR_3_COUNT):
        add(extrude_8.rotate(pattern_circular_3_axis, i * 360 / PATTERN_CIRCULAR_3_COUNT))


solid = part.part
